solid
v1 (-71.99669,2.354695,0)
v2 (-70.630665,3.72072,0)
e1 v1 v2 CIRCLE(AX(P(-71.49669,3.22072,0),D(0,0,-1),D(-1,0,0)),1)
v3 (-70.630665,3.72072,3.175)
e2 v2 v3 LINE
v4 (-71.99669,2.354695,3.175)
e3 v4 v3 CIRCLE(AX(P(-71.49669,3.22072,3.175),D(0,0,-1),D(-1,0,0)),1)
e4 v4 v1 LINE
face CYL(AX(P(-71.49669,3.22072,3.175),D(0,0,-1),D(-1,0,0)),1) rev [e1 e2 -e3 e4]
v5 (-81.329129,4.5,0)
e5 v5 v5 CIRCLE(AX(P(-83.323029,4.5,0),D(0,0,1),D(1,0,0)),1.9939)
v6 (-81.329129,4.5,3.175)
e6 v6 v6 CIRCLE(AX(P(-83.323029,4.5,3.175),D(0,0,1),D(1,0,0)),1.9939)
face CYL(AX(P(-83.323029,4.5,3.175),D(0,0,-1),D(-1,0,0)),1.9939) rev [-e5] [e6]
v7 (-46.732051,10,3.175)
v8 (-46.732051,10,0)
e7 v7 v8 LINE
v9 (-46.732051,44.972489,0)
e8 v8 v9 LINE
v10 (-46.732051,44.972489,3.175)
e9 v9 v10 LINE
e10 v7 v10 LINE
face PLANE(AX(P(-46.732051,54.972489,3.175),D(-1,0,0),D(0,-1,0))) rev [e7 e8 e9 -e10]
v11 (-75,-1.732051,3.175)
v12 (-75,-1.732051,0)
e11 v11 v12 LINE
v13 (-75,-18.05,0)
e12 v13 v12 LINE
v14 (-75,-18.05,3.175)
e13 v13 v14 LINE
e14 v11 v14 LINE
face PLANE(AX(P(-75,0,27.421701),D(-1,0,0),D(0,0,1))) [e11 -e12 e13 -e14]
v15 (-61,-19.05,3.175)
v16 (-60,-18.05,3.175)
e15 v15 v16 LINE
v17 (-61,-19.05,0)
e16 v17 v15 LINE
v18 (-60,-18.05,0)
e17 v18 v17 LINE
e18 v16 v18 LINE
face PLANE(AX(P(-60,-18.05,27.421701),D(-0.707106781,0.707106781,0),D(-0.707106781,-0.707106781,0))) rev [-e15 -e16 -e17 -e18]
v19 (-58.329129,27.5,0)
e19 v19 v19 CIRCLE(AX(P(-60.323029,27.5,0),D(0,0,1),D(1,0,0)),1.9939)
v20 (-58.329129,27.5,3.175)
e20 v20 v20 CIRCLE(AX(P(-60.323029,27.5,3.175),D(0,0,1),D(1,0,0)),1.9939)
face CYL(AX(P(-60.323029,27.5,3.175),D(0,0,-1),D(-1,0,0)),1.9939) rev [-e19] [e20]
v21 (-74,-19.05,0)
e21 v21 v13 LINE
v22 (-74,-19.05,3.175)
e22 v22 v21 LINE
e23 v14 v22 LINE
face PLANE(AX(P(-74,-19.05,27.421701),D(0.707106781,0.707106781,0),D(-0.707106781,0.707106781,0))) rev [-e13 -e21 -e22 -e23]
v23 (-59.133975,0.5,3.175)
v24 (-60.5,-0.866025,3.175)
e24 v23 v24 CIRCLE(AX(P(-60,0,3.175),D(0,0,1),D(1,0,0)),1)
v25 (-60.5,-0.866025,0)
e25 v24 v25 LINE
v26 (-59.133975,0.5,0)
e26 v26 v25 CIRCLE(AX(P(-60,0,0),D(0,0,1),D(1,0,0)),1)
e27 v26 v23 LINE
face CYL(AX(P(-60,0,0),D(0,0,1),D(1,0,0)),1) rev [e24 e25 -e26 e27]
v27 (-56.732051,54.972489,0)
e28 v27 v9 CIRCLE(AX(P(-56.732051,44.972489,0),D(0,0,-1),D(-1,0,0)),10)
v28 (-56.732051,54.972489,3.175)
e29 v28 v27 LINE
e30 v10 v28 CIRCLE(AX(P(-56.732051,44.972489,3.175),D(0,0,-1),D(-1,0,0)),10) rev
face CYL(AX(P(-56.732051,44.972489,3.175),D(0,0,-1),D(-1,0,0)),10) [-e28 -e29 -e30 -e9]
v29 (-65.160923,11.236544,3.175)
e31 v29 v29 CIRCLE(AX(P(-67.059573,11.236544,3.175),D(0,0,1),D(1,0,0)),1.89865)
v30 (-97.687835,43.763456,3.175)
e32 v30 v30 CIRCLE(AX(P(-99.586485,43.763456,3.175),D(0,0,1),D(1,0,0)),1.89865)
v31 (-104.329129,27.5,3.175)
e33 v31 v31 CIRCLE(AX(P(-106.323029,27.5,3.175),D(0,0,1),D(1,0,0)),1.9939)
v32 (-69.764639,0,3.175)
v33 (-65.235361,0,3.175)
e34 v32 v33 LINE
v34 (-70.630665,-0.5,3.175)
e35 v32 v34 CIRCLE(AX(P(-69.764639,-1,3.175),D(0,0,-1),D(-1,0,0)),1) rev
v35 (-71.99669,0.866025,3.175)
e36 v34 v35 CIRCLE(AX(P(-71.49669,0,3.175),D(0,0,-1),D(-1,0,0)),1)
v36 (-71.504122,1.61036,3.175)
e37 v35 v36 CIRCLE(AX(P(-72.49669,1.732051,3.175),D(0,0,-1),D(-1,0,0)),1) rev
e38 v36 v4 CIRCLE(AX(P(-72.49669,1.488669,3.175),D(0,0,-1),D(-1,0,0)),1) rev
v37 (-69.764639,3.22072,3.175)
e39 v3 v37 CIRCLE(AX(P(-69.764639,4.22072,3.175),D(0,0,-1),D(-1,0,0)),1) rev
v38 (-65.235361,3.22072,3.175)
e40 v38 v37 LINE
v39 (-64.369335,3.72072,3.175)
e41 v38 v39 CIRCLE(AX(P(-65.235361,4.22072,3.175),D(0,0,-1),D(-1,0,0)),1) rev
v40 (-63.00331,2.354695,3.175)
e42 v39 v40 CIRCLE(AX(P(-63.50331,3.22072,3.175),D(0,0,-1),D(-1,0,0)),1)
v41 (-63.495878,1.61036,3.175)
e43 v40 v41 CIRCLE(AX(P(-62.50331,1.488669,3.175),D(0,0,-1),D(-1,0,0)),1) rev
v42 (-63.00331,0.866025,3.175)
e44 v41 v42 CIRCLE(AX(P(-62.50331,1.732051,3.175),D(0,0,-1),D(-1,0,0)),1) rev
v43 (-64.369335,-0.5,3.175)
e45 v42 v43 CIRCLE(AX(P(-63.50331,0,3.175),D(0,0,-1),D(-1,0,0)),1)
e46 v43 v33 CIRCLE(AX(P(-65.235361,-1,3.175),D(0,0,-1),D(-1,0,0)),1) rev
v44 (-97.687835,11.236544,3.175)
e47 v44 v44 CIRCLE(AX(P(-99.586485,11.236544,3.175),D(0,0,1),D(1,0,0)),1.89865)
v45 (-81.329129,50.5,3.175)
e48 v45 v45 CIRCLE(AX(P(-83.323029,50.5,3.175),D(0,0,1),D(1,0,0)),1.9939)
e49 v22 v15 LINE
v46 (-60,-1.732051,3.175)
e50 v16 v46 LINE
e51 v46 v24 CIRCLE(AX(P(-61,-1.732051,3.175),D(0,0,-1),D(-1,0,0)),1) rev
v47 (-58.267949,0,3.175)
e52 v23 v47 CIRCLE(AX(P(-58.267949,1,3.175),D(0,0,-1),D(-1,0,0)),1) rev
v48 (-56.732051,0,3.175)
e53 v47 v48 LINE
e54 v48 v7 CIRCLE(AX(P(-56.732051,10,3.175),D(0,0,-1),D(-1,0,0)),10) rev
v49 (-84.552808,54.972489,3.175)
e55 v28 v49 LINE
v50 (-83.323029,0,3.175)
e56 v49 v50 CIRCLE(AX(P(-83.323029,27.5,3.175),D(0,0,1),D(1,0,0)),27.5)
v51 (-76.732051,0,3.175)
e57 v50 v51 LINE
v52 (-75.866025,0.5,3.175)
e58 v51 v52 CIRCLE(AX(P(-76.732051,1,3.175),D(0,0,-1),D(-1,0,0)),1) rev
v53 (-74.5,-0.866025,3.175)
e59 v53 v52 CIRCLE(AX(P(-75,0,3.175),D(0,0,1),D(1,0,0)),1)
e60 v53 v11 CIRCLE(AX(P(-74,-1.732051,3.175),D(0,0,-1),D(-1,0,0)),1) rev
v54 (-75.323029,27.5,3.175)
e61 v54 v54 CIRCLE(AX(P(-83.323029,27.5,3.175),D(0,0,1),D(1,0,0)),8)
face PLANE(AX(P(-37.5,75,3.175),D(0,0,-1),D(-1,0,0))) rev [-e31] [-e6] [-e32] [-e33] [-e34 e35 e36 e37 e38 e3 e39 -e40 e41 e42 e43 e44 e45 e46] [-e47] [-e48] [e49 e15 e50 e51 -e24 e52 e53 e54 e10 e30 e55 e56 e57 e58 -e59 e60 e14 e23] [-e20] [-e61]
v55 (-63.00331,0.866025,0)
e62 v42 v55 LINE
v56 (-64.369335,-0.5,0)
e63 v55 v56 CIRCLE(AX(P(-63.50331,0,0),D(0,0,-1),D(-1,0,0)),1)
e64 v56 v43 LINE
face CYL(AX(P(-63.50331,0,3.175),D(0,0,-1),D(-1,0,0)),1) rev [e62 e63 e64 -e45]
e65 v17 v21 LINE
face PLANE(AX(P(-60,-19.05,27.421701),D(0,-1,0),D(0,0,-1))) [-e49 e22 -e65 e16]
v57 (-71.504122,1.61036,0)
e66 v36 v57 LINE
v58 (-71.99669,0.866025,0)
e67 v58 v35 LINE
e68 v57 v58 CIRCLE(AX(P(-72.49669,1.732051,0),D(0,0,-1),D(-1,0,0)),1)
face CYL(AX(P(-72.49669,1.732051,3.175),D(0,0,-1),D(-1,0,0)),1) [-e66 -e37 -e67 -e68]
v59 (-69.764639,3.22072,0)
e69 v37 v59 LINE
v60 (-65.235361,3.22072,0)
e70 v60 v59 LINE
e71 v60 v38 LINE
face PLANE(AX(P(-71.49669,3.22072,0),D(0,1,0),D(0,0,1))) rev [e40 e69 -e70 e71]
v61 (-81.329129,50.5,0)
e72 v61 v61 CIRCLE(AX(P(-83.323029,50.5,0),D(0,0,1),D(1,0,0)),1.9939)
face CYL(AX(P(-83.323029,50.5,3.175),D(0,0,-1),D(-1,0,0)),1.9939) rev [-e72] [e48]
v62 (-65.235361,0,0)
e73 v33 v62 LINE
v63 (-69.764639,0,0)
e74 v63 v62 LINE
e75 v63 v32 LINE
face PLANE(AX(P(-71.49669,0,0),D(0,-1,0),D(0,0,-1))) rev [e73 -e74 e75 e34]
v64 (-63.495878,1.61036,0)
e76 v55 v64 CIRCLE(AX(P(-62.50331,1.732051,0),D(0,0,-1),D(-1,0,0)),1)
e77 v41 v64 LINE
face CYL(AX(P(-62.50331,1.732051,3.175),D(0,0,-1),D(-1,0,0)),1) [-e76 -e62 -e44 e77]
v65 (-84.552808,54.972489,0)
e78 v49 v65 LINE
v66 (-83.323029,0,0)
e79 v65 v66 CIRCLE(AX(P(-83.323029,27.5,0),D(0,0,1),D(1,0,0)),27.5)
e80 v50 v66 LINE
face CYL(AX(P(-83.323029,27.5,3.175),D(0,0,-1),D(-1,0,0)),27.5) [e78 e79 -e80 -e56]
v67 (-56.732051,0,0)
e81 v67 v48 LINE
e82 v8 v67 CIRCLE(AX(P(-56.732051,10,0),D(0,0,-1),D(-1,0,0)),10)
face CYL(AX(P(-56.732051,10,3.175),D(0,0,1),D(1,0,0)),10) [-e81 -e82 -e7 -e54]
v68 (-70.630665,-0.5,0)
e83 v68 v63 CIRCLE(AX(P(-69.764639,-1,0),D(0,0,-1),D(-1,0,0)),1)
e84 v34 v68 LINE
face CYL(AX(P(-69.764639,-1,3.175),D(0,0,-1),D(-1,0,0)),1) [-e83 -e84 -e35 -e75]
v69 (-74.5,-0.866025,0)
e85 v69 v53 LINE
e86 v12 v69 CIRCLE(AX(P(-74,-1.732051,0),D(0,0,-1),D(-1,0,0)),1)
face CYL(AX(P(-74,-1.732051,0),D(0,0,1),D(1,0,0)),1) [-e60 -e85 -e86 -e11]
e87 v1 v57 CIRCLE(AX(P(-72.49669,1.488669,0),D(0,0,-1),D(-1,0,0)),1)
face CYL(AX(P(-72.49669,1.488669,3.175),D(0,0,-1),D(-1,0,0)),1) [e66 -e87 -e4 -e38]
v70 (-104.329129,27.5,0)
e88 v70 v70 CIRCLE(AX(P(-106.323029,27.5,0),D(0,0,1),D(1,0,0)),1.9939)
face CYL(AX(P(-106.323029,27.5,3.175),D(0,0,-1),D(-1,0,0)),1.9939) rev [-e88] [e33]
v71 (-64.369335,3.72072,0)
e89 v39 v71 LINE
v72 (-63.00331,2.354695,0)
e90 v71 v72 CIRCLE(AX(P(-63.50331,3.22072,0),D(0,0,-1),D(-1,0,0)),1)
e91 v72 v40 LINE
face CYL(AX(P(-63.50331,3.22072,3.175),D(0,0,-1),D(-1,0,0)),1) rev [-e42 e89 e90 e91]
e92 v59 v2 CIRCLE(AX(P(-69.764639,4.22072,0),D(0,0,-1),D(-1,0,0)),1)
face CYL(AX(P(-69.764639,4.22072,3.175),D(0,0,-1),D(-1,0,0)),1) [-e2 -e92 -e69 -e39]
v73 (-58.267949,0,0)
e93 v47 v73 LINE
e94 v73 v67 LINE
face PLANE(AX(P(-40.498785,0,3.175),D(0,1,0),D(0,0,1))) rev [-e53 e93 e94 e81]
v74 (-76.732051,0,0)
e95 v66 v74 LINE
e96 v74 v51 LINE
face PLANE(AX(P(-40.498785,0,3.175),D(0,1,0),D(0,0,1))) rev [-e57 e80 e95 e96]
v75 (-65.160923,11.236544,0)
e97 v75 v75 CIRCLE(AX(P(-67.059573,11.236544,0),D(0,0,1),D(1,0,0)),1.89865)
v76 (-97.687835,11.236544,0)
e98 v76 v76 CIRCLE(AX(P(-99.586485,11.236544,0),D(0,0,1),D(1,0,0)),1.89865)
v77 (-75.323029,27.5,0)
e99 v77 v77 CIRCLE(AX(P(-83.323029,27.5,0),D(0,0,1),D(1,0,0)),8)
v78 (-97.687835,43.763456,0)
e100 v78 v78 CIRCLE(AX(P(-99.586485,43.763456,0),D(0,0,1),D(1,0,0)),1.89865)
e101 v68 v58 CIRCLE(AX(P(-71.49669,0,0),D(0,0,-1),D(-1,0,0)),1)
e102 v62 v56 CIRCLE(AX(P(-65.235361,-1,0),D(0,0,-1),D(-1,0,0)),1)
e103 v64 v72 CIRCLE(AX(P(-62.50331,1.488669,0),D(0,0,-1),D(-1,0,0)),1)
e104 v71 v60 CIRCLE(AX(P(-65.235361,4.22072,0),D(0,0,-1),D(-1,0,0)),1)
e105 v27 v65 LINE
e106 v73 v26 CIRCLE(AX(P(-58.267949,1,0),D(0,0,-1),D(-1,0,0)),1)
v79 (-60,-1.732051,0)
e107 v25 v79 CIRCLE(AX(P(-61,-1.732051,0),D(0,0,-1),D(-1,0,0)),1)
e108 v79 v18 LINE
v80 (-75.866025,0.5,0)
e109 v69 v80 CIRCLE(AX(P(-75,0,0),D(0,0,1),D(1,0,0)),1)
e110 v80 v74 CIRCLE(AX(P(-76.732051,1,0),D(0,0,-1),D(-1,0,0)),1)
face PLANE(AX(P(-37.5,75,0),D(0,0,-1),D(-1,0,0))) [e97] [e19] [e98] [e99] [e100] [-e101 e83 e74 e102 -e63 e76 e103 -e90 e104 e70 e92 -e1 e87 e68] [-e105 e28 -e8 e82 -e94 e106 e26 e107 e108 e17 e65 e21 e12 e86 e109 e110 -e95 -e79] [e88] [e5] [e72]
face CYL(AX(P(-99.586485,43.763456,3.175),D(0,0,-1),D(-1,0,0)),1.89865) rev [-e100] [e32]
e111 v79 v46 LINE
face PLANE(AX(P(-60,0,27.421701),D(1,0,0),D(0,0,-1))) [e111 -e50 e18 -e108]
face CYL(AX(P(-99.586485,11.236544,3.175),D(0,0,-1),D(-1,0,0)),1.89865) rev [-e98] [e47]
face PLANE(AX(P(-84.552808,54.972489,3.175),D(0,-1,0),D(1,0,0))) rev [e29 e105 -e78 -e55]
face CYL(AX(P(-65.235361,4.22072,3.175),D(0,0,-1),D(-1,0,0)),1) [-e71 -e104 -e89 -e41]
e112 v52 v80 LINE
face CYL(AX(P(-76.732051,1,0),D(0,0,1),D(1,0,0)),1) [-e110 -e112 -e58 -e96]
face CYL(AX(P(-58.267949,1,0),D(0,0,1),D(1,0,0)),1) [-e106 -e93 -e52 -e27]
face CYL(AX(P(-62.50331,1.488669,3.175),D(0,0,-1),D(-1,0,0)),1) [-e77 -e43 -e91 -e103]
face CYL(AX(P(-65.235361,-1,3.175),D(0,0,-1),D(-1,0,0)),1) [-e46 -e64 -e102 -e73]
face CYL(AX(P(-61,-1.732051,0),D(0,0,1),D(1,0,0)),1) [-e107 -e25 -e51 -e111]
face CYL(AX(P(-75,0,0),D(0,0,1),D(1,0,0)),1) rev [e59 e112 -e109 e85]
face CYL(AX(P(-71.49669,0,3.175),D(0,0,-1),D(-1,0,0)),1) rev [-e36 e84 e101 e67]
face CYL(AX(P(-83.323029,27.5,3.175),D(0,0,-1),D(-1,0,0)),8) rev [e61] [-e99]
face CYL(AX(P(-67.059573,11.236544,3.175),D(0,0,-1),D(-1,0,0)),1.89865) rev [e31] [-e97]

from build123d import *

# Parameters (mm, degrees)
SKETCH1_R           = 8
SKETCH1_R_2         = 1.89865
SKETCH1_R_3         = 1.9939
BOSS_EXTRUDE1_DEPTH = 3.175
FILLET1_R           = 10
SKETCH2_W           = 15
SKETCH2_H           = 19.05
BOSS_EXTRUDE2_DEPTH = 3.175
SKETCH3_R           = 1
CUT_EXTRUDE1_DEPTH  = 158.949594679
CHAMFER1_SIZE       = 1
FILLET2_R           = 1
SKETCH4_W           = 7.99338
SKETCH4_H           = 3.22072
CUT_EXTRUDE2_DEPTH  = 158.949594679
CUT_EXTRUDE3_DEPTH  = 158.949594679
FILLET3_R           = 10
SKETCH6_R           = 1
CUT_EXTRUDE4_DEPTH  = 124.748935267
FILLET4_R           = 1


with BuildPart() as part:
    # Sketch1 → Boss-Extrude1 (new body)
    with BuildSketch(Plane.XY):
        with BuildLine():
            Line((-40.498784978, 0), (0, 0))
            Line((0, 0), (0, 75))
            ThreePointArc((0, 75), (-37.5, 112.5), (-75, 75))
            Line((-75, 75), (-75, 55))
            Line((-75, 55), (-83.323029145, 55))
            ThreePointArc((-83.323029145, 55), (-110.823029145, 27.5), (-83.323029145, 0))
            Line((-83.323029145, 0), (-40.498784978, 0))
        make_face()
        with Locations((-83.323029145, 27.5)):
            Circle(SKETCH1_R, mode=Mode.SUBTRACT)
        with Locations((-67.059573177, 11.236544033)):
            Circle(SKETCH1_R_2, mode=Mode.SUBTRACT)
        with Locations((-83.323029145, 50.5)):
            Circle(SKETCH1_R_3, mode=Mode.SUBTRACT)
        with Locations((-99.586485112, 11.236544033)):
            Circle(SKETCH1_R_2, mode=Mode.SUBTRACT)
        with Locations((-60.323029145, 27.5)):
            Circle(SKETCH1_R_3, mode=Mode.SUBTRACT)
        with Locations((-99.586485112, 43.763455967)):
            Circle(SKETCH1_R_2, mode=Mode.SUBTRACT)
        with Locations((-83.323029145, 4.5)):
            Circle(SKETCH1_R_3, mode=Mode.SUBTRACT)
        with Locations((-106.323029145, 27.5)):
            Circle(SKETCH1_R_3, mode=Mode.SUBTRACT)
    extrude(amount=BOSS_EXTRUDE1_DEPTH)

    # Fillet1
    fillet1_edges = [part.edges().sort_by_distance(p)[0] for p in [
        (-75, 55, 1.5875),
    ]]
    fillet(fillet1_edges, radius=FILLET1_R)

    # Sketch2 → Boss-Extrude2 (add)
    with BuildSketch(Plane(origin=(0, 0, 0), x_dir=(-1, 0, 0), z_dir=(0, 0, -1))):
        with Locations((7.5, -9.525)):
            Rectangle(SKETCH2_W, SKETCH2_H)
        with Locations((37.5, -9.525)):
            Rectangle(SKETCH2_W, SKETCH2_H)
        with Locations((67.5, -9.525)):
            Rectangle(SKETCH2_W, SKETCH2_H)
    extrude(amount=-BOSS_EXTRUDE2_DEPTH)

    # Sketch3 → Cut-Extrude1 (cut, through all)
    with BuildSketch(Plane.XY.offset(3.175)):
        with Locations((-75, 0)):
            Circle(SKETCH3_R)
        with Locations((-60, 0)):
            Circle(SKETCH3_R)
        with Locations((-45, 0)):
            Circle(SKETCH3_R)
        with Locations((-30, 0)):
            Circle(SKETCH3_R)
        with Locations((-15, 0)):
            Circle(SKETCH3_R)
    extrude(amount=-CUT_EXTRUDE1_DEPTH, mode=Mode.SUBTRACT)

    # Chamfer1
    chamfer1_edges = [part.edges().sort_by_distance(p)[0] for p in [
        (0, -19.05, 1.5875),
        (-15, -19.05, 1.5875),
        (-30, -19.05, 1.5875),
        (-45, -19.05, 1.5875),
        (-60, -19.05, 1.5875),
        (-75, -19.05, 1.5875),
    ]]
    chamfer(chamfer1_edges, length=CHAMFER1_SIZE)

    # Fillet2
    fillet2_edges = [part.edges().sort_by_distance(p)[0] for p in [
        (-75, -1, 1.5875),
        (-76, 0, 1.5875),
        (-60, -1, 1.5875),
        (-59, 0, 1.5875),
        (-45, -1, 1.5875),
        (-46, 0, 1.5875),
        (-30, -1, 1.5875),
        (-29, 0, 1.5875),
        (-15, -1, 1.5875),
        (-16, 0, 1.5875),
    ]]
    fillet(fillet2_edges, radius=FILLET2_R)

    # Sketch4 → Cut-Extrude2 (cut, through all)
    with BuildSketch(Plane.XY.offset(3.175)):
        with Locations((-67.5, 1.61036)):
            Rectangle(SKETCH4_W, SKETCH4_H)
    extrude(amount=-CUT_EXTRUDE2_DEPTH, mode=Mode.SUBTRACT)

    # Sketch5 → Cut-Extrude3 (cut, through all)
    with BuildSketch(Plane(origin=(0, 0, 0), x_dir=(-1, 0, 0), z_dir=(0, 0, -1))):
        Polygon((84.552807772, 54.972488867), (46.732050808, 54.972488867), (46.732050808, 0), (46.732050808, -19.05), (0, -19.05), (0, 112.5), (84.552807772, 112.5), align=None)
    extrude(amount=-CUT_EXTRUDE3_DEPTH, mode=Mode.SUBTRACT)

    # Fillet3
    fillet3_edges = [part.edges().sort_by_distance(p)[0] for p in [
        (-46.732050808, 0, 1.5875),
        (-46.732050808, 54.972488867, 1.5875),
    ]]
    fillet(fillet3_edges, radius=FILLET3_R)

    # Sketch6 → Cut-Extrude4 (cut, through all)
    with BuildSketch(Plane(origin=(0, 0, 0), x_dir=(-1, 0, 0), z_dir=(0, 0, -1))):
        with Locations((63.50331, 3.22072)):
            Circle(SKETCH6_R)
        with Locations((71.49669, 3.22072)):
            Circle(SKETCH6_R)
        with Locations((71.49669, 0)):
            Circle(SKETCH6_R)
        with Locations((63.50331, 0)):
            Circle(SKETCH6_R)
    extrude(amount=-CUT_EXTRUDE4_DEPTH, mode=Mode.SUBTRACT)

    # Fillet4
    # the kernel refuses this fillet: 1 mm, written as the material it takes off along each edge
    with BuildSketch(Plane(origin=(-70.49669, 3.22072, 5.005127019), x_dir=(1, 0, 0), z_dir=(0, 0, -1)), Plane(origin=(-71.49669, 1, 5.005127019), x_dir=(0, 1, 0), z_dir=(0, 0, -1)), Plane(origin=(-63.50331, 2.22072, 5.005127019), x_dir=(0, -1, 0), z_dir=(0, 0, -1))) as fillet4_piece_1:
        with BuildLine():
            CenterArc((0.732050808, -1), FILLET4_R, 90, 60)
            ThreePointArc((-0.133974596, -0.5), (-0.034074174, -0.258819045), (0, 0))
            Line((0, 0), (0.732050808, 0))
        make_face()
    extrude(amount=6.835254038, mode=Mode.SUBTRACT)
    with BuildSketch(Plane(origin=(-71.49669, 2.22072, 5.005127019), x_dir=(-0.9659258262890673, 0.25881904510252446, 0), z_dir=(0, 0, -1)), Plane(origin=(-70.49669, 0, 5.005127019), x_dir=(-0.25881904510253056, -0.9659258262890658, 0), z_dir=(0, 0, -1))) as fillet4_piece_2:
        with BuildLine():
            CenterArc((0.776457135, -0.965925826), FILLET4_R, 105, 60)
            Line((-0.189468691, -0.707106781), (0, 0))
            ThreePointArc((0, 0), (0.258819045, -0.034074174), (0.51763809, 0))
        make_face()
    extrude(amount=6.835254038, mode=Mode.SUBTRACT)
    with BuildSketch(Plane(origin=(-64.50331, 0, -1.830127019), x_dir=(-1, 0, 0), z_dir=(0, 0, 1)), Plane(origin=(-63.50331, 1, 5.005127019), x_dir=(0, 1, 0), z_dir=(0, 0, -1))) as fillet4_piece_3:
        with BuildLine():
            CenterArc((0.732050808, 1), FILLET4_R, 210, 60)
            ThreePointArc((-0.133974596, 0.5), (-0.034074174, 0.258819045), (0, 0))
            Line((0, 0), (0.732050808, 0))
        make_face()
    extrude(amount=6.835254038, mode=Mode.SUBTRACT)
    with BuildSketch(Plane(origin=(-64.50331, 3.22072, -1.830127019), x_dir=(0.25881904510250514, 0.9659258262890725, 0), z_dir=(0, 0, 1))) as fillet4_piece_4:
        with BuildLine():
            CenterArc((0.776457135, 0.965925826), FILLET4_R, 195, 60)
            Line((-0.189468691, 0.707106781), (0, 0))
            ThreePointArc((0, 0), (0.258819045, 0.034074174), (0.51763809, 0))
        make_face()
    extrude(amount=6.835254038, mode=Mode.SUBTRACT)


solid = part.part
